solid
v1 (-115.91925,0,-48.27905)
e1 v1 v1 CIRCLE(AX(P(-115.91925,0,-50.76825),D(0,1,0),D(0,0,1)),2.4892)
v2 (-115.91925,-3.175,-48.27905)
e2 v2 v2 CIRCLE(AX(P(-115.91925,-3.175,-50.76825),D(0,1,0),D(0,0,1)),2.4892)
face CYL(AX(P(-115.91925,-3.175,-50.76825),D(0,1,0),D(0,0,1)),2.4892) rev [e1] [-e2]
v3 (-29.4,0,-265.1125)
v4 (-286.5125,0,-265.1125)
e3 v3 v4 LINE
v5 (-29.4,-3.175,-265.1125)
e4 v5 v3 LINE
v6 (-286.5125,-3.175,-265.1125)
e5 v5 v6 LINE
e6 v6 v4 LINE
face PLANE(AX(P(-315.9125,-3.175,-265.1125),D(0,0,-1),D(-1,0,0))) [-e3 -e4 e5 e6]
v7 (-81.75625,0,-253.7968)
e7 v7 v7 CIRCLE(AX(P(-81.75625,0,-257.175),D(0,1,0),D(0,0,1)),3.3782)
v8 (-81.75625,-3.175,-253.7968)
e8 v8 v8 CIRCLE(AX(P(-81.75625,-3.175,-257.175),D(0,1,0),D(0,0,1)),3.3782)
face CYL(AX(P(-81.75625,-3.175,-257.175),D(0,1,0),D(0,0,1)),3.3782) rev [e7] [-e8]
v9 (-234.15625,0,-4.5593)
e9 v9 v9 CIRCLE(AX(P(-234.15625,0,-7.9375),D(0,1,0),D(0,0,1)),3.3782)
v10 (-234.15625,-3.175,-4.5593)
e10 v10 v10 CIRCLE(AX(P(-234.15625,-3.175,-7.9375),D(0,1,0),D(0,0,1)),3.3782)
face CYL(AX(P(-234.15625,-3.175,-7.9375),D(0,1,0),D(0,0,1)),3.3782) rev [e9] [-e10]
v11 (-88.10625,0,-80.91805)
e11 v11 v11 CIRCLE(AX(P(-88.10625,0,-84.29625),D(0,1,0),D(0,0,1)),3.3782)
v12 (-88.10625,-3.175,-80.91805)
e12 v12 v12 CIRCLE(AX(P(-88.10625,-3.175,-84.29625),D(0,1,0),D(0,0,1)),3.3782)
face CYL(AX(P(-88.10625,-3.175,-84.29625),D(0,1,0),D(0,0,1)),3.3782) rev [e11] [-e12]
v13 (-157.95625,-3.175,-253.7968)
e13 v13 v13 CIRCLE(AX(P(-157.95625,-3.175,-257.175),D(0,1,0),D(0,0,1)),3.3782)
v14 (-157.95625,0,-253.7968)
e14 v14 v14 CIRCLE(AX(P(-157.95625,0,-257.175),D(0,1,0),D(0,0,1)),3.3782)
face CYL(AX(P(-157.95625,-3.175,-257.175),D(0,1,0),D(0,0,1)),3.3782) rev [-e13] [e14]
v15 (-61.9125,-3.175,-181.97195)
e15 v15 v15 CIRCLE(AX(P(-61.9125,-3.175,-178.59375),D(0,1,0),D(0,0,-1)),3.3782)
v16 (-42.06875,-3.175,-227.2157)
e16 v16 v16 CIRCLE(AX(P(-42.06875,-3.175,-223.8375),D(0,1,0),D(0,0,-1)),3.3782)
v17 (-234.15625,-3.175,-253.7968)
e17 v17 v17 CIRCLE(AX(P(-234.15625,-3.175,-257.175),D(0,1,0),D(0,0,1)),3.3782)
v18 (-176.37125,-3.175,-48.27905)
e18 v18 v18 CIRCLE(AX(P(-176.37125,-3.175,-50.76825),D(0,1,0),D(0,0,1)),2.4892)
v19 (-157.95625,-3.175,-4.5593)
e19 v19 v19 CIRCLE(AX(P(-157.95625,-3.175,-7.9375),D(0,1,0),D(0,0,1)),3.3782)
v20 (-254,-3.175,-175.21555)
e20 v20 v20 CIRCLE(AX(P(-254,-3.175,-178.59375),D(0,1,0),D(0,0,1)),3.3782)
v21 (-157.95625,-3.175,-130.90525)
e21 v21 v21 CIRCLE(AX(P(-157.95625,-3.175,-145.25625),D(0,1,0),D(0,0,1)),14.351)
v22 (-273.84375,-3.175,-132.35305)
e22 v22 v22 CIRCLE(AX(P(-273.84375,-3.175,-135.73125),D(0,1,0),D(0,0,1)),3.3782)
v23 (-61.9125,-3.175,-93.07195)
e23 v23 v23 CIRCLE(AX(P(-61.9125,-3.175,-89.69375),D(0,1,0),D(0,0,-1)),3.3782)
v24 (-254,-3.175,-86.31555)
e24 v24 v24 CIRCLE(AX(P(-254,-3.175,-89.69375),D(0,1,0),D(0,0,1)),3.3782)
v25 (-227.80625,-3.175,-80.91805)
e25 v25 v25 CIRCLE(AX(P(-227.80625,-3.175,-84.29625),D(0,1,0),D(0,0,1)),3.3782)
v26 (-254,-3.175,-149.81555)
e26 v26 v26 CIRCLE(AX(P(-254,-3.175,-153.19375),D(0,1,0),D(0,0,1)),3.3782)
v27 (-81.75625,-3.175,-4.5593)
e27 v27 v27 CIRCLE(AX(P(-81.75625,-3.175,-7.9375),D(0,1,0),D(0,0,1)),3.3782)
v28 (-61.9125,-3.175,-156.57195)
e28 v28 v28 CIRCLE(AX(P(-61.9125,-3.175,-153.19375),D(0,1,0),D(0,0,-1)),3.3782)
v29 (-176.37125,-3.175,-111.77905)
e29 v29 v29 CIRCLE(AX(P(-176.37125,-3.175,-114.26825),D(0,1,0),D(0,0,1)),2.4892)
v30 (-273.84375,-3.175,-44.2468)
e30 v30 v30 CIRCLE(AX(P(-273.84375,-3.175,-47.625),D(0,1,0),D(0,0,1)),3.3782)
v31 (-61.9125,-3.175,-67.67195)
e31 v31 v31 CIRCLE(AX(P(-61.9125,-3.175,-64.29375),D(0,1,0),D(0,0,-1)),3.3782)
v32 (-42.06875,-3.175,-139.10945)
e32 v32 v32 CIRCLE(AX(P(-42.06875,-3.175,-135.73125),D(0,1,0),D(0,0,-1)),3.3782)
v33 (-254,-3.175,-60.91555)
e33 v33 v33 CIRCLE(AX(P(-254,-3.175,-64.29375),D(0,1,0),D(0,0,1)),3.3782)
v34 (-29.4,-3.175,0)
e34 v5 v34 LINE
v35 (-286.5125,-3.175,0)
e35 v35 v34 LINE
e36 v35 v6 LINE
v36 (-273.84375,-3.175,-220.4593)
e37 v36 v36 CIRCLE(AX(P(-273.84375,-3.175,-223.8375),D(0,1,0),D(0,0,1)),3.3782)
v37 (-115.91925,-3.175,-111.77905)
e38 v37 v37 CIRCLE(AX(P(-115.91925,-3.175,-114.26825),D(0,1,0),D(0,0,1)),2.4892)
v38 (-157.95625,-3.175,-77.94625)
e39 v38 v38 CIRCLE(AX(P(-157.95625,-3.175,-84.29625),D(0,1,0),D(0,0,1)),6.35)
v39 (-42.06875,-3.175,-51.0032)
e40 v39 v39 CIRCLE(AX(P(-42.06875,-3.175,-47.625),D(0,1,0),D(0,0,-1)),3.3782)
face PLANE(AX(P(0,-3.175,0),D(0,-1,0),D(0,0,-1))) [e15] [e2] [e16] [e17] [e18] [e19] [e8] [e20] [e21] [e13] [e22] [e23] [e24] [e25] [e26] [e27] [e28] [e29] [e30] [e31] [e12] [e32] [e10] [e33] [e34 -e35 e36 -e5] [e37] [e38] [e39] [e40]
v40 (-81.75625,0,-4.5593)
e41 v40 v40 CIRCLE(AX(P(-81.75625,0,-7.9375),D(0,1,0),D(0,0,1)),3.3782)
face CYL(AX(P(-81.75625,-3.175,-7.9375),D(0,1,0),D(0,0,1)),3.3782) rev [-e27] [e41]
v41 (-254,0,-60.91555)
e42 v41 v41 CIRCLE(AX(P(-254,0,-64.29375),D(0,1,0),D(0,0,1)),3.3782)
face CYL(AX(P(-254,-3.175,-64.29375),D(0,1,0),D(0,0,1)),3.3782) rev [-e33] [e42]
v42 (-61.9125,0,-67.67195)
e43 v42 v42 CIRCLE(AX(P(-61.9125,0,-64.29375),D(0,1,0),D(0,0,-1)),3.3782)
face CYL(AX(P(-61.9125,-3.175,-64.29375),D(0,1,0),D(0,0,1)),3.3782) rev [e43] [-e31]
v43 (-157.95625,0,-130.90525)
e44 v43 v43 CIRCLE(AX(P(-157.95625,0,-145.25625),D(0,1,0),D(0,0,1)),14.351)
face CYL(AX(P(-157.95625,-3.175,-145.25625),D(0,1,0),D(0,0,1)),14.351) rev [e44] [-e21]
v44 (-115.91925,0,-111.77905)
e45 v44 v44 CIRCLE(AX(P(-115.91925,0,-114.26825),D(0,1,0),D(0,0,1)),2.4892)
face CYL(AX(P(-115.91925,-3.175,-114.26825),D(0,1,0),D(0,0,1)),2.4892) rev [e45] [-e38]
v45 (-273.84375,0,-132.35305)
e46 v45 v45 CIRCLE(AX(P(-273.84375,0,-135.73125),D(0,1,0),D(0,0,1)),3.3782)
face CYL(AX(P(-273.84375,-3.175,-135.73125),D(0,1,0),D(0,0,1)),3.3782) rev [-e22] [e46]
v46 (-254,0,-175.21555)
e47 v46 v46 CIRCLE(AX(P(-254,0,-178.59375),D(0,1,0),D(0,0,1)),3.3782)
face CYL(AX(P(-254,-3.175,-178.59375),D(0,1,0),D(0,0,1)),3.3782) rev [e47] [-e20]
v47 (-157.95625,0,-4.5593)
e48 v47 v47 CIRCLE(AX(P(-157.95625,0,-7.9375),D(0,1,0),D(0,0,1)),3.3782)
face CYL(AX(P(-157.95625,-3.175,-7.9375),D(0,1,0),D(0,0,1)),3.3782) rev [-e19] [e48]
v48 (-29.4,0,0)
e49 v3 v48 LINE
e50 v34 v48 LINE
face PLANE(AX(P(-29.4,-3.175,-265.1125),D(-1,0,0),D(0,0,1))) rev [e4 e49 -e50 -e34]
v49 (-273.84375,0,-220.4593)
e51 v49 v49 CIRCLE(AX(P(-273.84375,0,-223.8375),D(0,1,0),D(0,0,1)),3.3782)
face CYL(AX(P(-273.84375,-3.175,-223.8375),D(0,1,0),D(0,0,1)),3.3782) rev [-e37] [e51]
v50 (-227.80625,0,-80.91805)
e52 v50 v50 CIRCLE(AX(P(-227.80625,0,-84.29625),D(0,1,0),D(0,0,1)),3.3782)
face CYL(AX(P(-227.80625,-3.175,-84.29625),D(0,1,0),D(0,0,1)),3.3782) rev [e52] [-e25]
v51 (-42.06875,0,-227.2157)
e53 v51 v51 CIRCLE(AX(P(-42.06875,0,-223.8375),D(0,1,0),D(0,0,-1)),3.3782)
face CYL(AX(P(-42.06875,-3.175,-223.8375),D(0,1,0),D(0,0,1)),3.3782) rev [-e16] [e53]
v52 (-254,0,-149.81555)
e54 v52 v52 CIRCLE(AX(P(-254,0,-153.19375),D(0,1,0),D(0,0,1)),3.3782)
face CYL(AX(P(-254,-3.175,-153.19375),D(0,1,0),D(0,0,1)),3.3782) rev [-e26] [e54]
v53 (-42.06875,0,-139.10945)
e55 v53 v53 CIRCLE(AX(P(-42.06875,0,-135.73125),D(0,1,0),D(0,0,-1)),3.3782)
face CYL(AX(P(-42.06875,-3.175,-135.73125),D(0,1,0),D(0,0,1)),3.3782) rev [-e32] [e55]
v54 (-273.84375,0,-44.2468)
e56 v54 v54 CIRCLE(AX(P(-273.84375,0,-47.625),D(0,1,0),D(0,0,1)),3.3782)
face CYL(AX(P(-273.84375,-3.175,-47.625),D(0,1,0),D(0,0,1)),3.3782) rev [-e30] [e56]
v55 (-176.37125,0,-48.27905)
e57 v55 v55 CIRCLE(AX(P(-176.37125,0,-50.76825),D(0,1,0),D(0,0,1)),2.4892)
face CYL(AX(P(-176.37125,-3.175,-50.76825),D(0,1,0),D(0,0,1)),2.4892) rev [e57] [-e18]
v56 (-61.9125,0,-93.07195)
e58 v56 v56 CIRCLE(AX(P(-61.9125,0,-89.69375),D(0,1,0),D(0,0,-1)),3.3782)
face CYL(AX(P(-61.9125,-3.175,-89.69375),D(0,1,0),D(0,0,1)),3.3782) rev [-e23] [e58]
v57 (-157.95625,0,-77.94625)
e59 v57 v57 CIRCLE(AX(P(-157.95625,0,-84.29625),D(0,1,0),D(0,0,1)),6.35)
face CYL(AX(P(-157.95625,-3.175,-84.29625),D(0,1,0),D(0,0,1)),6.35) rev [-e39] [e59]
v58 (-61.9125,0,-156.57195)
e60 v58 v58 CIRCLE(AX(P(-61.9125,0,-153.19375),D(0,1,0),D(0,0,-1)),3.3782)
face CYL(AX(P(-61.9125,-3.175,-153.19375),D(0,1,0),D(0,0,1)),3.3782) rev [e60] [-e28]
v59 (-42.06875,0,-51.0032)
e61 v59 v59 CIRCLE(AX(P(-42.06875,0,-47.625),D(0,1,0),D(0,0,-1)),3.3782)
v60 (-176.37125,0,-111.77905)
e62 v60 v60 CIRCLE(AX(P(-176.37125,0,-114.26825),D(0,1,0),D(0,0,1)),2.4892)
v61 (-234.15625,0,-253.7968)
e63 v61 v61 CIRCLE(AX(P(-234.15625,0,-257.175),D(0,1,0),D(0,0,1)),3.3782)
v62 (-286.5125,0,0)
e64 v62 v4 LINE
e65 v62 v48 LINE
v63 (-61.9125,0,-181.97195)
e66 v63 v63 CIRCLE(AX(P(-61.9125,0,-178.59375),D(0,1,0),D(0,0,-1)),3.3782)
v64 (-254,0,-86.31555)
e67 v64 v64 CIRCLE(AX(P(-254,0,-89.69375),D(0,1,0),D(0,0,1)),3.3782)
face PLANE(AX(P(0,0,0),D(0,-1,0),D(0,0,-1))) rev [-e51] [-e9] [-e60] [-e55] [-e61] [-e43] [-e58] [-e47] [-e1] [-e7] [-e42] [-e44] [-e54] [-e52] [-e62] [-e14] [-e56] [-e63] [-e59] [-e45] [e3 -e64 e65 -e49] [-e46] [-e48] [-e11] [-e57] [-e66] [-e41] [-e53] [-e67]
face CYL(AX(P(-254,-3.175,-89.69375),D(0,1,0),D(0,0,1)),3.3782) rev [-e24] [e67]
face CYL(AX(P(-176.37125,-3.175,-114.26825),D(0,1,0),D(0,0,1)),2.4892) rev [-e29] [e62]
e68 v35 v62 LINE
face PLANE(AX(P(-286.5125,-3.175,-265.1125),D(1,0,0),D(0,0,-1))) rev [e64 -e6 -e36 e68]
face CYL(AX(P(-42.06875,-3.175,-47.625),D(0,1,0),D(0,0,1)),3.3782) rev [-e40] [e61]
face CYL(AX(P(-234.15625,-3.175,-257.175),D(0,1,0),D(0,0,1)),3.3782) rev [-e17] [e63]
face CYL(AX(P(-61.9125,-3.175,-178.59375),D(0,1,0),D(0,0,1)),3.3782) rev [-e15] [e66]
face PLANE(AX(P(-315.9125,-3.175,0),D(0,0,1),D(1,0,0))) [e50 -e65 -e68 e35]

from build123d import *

# Parameters (mm, degrees)
SKETCH1_W          = 315.9125
SKETCH1_H          = 265.1125
SKETCH1_R          = 3.3782
SKETCH1_R_2        = 14.351
SKETCH1_R_3        = 6.35
SKETCH1_R_4        = 2.4892
BASE_FLANGE1_DEPTH = 3.175
SKETCH2_W          = 29.4
SKETCH2_H          = 265.1125
CUT_EXTRUDE1_DEPTH = 413.426267274


# Sheet-metal steps are written as plain solids
with BuildPart() as part:
    # Sketch1 → Base-Flange1 (new body)
    with BuildSketch(Plane(origin=(0, 0, 0), x_dir=(1, 0, 0), z_dir=(0, 1, 0))):
        with Locations((-157.95625, 132.55625)):
            Rectangle(SKETCH1_W, SKETCH1_H)
        with Locations(Location((-254, 64.29375, 0), (0, 0, 270))):
            Circle(SKETCH1_R, mode=Mode.SUBTRACT)
        with Locations(Location((-254, 89.69375, 0), (0, 0, 270))):
            Circle(SKETCH1_R, mode=Mode.SUBTRACT)
        with Locations(Location((-254, 153.19375, 0), (0, 0, 270))):
            Circle(SKETCH1_R, mode=Mode.SUBTRACT)
        with Locations(Location((-254, 178.59375, 0), (0, 0, 270))):
            Circle(SKETCH1_R, mode=Mode.SUBTRACT)
        with Locations(Location((-61.9125, 64.29375, 0), (0, 0, 90))):
            Circle(SKETCH1_R, mode=Mode.SUBTRACT)
        with Locations(Location((-61.9125, 89.69375, 0), (0, 0, 90))):
            Circle(SKETCH1_R, mode=Mode.SUBTRACT)
        with Locations(Location((-61.9125, 153.19375, 0), (0, 0, 90))):
            Circle(SKETCH1_R, mode=Mode.SUBTRACT)
        with Locations(Location((-61.9125, 178.59375, 0), (0, 0, 90))):
            Circle(SKETCH1_R, mode=Mode.SUBTRACT)
        with Locations(Location((-157.95625, 145.25625, 0), (0, 0, 270))):
            Circle(SKETCH1_R_2, mode=Mode.SUBTRACT)
        with Locations(Location((-157.95625, 84.29625, 0), (0, 0, 270))):
            Circle(SKETCH1_R_3, mode=Mode.SUBTRACT)
        with Locations(Location((-176.37125, 114.26825, 0), (0, 0, 270))):
            Circle(SKETCH1_R_4, mode=Mode.SUBTRACT)
        with Locations(Location((-115.91925, 114.26825, 0), (0, 0, 270))):
            Circle(SKETCH1_R_4, mode=Mode.SUBTRACT)
        with Locations(Location((-115.91925, 50.76825, 0), (0, 0, 270))):
            Circle(SKETCH1_R_4, mode=Mode.SUBTRACT)
        with Locations(Location((-176.37125, 50.76825, 0), (0, 0, 270))):
            Circle(SKETCH1_R_4, mode=Mode.SUBTRACT)
        with Locations(Location((-234.15625, 7.9375, 0), (0, 0, 270))):
            Circle(SKETCH1_R, mode=Mode.SUBTRACT)
        with Locations(Location((-157.95625, 7.9375, 0), (0, 0, 270))):
            Circle(SKETCH1_R, mode=Mode.SUBTRACT)
        with Locations(Location((-81.75625, 7.9375, 0), (0, 0, 270))):
            Circle(SKETCH1_R, mode=Mode.SUBTRACT)
        with Locations(Location((-157.95625, 257.175, 0), (0, 0, 270))):
            Circle(SKETCH1_R, mode=Mode.SUBTRACT)
        with Locations(Location((-81.75625, 257.175, 0), (0, 0, 270))):
            Circle(SKETCH1_R, mode=Mode.SUBTRACT)
        with Locations(Location((-234.15625, 257.175, 0), (0, 0, 270))):
            Circle(SKETCH1_R, mode=Mode.SUBTRACT)
        with Locations(Location((-227.80625, 84.29625, 0), (0, 0, 270))):
            Circle(SKETCH1_R, mode=Mode.SUBTRACT)
        with Locations(Location((-88.10625, 84.29625, 0), (0, 0, 270))):
            Circle(SKETCH1_R, mode=Mode.SUBTRACT)
        with Locations(Location((-273.84375, 223.8375, 0), (0, 0, 270))):
            Circle(SKETCH1_R, mode=Mode.SUBTRACT)
        with Locations(Location((-273.84375, 135.73125, 0), (0, 0, 270))):
            Circle(SKETCH1_R, mode=Mode.SUBTRACT)
        with Locations(Location((-273.84375, 47.625, 0), (0, 0, 270))):
            Circle(SKETCH1_R, mode=Mode.SUBTRACT)
        with Locations(Location((-42.06875, 223.8375, 0), (0, 0, 90))):
            Circle(SKETCH1_R, mode=Mode.SUBTRACT)
        with Locations(Location((-42.06875, 135.73125, 0), (0, 0, 90))):
            Circle(SKETCH1_R, mode=Mode.SUBTRACT)
        with Locations(Location((-42.06875, 47.625, 0), (0, 0, 90))):
            Circle(SKETCH1_R, mode=Mode.SUBTRACT)
    extrude(amount=-BASE_FLANGE1_DEPTH)

    # Sketch2 → Cut-Extrude1 (cut, through all)
    with BuildSketch(Plane(origin=(0, 0, 0), x_dir=(1, 0, 0), z_dir=(0, 1, 0))):
        with Locations((-301.2125, 132.55625)):
            Rectangle(SKETCH2_W, SKETCH2_H)
        with Locations((-14.7, 132.55625)):
            Rectangle(SKETCH2_W, SKETCH2_H)
    extrude(amount=-CUT_EXTRUDE1_DEPTH, mode=Mode.SUBTRACT)


solid = part.part
